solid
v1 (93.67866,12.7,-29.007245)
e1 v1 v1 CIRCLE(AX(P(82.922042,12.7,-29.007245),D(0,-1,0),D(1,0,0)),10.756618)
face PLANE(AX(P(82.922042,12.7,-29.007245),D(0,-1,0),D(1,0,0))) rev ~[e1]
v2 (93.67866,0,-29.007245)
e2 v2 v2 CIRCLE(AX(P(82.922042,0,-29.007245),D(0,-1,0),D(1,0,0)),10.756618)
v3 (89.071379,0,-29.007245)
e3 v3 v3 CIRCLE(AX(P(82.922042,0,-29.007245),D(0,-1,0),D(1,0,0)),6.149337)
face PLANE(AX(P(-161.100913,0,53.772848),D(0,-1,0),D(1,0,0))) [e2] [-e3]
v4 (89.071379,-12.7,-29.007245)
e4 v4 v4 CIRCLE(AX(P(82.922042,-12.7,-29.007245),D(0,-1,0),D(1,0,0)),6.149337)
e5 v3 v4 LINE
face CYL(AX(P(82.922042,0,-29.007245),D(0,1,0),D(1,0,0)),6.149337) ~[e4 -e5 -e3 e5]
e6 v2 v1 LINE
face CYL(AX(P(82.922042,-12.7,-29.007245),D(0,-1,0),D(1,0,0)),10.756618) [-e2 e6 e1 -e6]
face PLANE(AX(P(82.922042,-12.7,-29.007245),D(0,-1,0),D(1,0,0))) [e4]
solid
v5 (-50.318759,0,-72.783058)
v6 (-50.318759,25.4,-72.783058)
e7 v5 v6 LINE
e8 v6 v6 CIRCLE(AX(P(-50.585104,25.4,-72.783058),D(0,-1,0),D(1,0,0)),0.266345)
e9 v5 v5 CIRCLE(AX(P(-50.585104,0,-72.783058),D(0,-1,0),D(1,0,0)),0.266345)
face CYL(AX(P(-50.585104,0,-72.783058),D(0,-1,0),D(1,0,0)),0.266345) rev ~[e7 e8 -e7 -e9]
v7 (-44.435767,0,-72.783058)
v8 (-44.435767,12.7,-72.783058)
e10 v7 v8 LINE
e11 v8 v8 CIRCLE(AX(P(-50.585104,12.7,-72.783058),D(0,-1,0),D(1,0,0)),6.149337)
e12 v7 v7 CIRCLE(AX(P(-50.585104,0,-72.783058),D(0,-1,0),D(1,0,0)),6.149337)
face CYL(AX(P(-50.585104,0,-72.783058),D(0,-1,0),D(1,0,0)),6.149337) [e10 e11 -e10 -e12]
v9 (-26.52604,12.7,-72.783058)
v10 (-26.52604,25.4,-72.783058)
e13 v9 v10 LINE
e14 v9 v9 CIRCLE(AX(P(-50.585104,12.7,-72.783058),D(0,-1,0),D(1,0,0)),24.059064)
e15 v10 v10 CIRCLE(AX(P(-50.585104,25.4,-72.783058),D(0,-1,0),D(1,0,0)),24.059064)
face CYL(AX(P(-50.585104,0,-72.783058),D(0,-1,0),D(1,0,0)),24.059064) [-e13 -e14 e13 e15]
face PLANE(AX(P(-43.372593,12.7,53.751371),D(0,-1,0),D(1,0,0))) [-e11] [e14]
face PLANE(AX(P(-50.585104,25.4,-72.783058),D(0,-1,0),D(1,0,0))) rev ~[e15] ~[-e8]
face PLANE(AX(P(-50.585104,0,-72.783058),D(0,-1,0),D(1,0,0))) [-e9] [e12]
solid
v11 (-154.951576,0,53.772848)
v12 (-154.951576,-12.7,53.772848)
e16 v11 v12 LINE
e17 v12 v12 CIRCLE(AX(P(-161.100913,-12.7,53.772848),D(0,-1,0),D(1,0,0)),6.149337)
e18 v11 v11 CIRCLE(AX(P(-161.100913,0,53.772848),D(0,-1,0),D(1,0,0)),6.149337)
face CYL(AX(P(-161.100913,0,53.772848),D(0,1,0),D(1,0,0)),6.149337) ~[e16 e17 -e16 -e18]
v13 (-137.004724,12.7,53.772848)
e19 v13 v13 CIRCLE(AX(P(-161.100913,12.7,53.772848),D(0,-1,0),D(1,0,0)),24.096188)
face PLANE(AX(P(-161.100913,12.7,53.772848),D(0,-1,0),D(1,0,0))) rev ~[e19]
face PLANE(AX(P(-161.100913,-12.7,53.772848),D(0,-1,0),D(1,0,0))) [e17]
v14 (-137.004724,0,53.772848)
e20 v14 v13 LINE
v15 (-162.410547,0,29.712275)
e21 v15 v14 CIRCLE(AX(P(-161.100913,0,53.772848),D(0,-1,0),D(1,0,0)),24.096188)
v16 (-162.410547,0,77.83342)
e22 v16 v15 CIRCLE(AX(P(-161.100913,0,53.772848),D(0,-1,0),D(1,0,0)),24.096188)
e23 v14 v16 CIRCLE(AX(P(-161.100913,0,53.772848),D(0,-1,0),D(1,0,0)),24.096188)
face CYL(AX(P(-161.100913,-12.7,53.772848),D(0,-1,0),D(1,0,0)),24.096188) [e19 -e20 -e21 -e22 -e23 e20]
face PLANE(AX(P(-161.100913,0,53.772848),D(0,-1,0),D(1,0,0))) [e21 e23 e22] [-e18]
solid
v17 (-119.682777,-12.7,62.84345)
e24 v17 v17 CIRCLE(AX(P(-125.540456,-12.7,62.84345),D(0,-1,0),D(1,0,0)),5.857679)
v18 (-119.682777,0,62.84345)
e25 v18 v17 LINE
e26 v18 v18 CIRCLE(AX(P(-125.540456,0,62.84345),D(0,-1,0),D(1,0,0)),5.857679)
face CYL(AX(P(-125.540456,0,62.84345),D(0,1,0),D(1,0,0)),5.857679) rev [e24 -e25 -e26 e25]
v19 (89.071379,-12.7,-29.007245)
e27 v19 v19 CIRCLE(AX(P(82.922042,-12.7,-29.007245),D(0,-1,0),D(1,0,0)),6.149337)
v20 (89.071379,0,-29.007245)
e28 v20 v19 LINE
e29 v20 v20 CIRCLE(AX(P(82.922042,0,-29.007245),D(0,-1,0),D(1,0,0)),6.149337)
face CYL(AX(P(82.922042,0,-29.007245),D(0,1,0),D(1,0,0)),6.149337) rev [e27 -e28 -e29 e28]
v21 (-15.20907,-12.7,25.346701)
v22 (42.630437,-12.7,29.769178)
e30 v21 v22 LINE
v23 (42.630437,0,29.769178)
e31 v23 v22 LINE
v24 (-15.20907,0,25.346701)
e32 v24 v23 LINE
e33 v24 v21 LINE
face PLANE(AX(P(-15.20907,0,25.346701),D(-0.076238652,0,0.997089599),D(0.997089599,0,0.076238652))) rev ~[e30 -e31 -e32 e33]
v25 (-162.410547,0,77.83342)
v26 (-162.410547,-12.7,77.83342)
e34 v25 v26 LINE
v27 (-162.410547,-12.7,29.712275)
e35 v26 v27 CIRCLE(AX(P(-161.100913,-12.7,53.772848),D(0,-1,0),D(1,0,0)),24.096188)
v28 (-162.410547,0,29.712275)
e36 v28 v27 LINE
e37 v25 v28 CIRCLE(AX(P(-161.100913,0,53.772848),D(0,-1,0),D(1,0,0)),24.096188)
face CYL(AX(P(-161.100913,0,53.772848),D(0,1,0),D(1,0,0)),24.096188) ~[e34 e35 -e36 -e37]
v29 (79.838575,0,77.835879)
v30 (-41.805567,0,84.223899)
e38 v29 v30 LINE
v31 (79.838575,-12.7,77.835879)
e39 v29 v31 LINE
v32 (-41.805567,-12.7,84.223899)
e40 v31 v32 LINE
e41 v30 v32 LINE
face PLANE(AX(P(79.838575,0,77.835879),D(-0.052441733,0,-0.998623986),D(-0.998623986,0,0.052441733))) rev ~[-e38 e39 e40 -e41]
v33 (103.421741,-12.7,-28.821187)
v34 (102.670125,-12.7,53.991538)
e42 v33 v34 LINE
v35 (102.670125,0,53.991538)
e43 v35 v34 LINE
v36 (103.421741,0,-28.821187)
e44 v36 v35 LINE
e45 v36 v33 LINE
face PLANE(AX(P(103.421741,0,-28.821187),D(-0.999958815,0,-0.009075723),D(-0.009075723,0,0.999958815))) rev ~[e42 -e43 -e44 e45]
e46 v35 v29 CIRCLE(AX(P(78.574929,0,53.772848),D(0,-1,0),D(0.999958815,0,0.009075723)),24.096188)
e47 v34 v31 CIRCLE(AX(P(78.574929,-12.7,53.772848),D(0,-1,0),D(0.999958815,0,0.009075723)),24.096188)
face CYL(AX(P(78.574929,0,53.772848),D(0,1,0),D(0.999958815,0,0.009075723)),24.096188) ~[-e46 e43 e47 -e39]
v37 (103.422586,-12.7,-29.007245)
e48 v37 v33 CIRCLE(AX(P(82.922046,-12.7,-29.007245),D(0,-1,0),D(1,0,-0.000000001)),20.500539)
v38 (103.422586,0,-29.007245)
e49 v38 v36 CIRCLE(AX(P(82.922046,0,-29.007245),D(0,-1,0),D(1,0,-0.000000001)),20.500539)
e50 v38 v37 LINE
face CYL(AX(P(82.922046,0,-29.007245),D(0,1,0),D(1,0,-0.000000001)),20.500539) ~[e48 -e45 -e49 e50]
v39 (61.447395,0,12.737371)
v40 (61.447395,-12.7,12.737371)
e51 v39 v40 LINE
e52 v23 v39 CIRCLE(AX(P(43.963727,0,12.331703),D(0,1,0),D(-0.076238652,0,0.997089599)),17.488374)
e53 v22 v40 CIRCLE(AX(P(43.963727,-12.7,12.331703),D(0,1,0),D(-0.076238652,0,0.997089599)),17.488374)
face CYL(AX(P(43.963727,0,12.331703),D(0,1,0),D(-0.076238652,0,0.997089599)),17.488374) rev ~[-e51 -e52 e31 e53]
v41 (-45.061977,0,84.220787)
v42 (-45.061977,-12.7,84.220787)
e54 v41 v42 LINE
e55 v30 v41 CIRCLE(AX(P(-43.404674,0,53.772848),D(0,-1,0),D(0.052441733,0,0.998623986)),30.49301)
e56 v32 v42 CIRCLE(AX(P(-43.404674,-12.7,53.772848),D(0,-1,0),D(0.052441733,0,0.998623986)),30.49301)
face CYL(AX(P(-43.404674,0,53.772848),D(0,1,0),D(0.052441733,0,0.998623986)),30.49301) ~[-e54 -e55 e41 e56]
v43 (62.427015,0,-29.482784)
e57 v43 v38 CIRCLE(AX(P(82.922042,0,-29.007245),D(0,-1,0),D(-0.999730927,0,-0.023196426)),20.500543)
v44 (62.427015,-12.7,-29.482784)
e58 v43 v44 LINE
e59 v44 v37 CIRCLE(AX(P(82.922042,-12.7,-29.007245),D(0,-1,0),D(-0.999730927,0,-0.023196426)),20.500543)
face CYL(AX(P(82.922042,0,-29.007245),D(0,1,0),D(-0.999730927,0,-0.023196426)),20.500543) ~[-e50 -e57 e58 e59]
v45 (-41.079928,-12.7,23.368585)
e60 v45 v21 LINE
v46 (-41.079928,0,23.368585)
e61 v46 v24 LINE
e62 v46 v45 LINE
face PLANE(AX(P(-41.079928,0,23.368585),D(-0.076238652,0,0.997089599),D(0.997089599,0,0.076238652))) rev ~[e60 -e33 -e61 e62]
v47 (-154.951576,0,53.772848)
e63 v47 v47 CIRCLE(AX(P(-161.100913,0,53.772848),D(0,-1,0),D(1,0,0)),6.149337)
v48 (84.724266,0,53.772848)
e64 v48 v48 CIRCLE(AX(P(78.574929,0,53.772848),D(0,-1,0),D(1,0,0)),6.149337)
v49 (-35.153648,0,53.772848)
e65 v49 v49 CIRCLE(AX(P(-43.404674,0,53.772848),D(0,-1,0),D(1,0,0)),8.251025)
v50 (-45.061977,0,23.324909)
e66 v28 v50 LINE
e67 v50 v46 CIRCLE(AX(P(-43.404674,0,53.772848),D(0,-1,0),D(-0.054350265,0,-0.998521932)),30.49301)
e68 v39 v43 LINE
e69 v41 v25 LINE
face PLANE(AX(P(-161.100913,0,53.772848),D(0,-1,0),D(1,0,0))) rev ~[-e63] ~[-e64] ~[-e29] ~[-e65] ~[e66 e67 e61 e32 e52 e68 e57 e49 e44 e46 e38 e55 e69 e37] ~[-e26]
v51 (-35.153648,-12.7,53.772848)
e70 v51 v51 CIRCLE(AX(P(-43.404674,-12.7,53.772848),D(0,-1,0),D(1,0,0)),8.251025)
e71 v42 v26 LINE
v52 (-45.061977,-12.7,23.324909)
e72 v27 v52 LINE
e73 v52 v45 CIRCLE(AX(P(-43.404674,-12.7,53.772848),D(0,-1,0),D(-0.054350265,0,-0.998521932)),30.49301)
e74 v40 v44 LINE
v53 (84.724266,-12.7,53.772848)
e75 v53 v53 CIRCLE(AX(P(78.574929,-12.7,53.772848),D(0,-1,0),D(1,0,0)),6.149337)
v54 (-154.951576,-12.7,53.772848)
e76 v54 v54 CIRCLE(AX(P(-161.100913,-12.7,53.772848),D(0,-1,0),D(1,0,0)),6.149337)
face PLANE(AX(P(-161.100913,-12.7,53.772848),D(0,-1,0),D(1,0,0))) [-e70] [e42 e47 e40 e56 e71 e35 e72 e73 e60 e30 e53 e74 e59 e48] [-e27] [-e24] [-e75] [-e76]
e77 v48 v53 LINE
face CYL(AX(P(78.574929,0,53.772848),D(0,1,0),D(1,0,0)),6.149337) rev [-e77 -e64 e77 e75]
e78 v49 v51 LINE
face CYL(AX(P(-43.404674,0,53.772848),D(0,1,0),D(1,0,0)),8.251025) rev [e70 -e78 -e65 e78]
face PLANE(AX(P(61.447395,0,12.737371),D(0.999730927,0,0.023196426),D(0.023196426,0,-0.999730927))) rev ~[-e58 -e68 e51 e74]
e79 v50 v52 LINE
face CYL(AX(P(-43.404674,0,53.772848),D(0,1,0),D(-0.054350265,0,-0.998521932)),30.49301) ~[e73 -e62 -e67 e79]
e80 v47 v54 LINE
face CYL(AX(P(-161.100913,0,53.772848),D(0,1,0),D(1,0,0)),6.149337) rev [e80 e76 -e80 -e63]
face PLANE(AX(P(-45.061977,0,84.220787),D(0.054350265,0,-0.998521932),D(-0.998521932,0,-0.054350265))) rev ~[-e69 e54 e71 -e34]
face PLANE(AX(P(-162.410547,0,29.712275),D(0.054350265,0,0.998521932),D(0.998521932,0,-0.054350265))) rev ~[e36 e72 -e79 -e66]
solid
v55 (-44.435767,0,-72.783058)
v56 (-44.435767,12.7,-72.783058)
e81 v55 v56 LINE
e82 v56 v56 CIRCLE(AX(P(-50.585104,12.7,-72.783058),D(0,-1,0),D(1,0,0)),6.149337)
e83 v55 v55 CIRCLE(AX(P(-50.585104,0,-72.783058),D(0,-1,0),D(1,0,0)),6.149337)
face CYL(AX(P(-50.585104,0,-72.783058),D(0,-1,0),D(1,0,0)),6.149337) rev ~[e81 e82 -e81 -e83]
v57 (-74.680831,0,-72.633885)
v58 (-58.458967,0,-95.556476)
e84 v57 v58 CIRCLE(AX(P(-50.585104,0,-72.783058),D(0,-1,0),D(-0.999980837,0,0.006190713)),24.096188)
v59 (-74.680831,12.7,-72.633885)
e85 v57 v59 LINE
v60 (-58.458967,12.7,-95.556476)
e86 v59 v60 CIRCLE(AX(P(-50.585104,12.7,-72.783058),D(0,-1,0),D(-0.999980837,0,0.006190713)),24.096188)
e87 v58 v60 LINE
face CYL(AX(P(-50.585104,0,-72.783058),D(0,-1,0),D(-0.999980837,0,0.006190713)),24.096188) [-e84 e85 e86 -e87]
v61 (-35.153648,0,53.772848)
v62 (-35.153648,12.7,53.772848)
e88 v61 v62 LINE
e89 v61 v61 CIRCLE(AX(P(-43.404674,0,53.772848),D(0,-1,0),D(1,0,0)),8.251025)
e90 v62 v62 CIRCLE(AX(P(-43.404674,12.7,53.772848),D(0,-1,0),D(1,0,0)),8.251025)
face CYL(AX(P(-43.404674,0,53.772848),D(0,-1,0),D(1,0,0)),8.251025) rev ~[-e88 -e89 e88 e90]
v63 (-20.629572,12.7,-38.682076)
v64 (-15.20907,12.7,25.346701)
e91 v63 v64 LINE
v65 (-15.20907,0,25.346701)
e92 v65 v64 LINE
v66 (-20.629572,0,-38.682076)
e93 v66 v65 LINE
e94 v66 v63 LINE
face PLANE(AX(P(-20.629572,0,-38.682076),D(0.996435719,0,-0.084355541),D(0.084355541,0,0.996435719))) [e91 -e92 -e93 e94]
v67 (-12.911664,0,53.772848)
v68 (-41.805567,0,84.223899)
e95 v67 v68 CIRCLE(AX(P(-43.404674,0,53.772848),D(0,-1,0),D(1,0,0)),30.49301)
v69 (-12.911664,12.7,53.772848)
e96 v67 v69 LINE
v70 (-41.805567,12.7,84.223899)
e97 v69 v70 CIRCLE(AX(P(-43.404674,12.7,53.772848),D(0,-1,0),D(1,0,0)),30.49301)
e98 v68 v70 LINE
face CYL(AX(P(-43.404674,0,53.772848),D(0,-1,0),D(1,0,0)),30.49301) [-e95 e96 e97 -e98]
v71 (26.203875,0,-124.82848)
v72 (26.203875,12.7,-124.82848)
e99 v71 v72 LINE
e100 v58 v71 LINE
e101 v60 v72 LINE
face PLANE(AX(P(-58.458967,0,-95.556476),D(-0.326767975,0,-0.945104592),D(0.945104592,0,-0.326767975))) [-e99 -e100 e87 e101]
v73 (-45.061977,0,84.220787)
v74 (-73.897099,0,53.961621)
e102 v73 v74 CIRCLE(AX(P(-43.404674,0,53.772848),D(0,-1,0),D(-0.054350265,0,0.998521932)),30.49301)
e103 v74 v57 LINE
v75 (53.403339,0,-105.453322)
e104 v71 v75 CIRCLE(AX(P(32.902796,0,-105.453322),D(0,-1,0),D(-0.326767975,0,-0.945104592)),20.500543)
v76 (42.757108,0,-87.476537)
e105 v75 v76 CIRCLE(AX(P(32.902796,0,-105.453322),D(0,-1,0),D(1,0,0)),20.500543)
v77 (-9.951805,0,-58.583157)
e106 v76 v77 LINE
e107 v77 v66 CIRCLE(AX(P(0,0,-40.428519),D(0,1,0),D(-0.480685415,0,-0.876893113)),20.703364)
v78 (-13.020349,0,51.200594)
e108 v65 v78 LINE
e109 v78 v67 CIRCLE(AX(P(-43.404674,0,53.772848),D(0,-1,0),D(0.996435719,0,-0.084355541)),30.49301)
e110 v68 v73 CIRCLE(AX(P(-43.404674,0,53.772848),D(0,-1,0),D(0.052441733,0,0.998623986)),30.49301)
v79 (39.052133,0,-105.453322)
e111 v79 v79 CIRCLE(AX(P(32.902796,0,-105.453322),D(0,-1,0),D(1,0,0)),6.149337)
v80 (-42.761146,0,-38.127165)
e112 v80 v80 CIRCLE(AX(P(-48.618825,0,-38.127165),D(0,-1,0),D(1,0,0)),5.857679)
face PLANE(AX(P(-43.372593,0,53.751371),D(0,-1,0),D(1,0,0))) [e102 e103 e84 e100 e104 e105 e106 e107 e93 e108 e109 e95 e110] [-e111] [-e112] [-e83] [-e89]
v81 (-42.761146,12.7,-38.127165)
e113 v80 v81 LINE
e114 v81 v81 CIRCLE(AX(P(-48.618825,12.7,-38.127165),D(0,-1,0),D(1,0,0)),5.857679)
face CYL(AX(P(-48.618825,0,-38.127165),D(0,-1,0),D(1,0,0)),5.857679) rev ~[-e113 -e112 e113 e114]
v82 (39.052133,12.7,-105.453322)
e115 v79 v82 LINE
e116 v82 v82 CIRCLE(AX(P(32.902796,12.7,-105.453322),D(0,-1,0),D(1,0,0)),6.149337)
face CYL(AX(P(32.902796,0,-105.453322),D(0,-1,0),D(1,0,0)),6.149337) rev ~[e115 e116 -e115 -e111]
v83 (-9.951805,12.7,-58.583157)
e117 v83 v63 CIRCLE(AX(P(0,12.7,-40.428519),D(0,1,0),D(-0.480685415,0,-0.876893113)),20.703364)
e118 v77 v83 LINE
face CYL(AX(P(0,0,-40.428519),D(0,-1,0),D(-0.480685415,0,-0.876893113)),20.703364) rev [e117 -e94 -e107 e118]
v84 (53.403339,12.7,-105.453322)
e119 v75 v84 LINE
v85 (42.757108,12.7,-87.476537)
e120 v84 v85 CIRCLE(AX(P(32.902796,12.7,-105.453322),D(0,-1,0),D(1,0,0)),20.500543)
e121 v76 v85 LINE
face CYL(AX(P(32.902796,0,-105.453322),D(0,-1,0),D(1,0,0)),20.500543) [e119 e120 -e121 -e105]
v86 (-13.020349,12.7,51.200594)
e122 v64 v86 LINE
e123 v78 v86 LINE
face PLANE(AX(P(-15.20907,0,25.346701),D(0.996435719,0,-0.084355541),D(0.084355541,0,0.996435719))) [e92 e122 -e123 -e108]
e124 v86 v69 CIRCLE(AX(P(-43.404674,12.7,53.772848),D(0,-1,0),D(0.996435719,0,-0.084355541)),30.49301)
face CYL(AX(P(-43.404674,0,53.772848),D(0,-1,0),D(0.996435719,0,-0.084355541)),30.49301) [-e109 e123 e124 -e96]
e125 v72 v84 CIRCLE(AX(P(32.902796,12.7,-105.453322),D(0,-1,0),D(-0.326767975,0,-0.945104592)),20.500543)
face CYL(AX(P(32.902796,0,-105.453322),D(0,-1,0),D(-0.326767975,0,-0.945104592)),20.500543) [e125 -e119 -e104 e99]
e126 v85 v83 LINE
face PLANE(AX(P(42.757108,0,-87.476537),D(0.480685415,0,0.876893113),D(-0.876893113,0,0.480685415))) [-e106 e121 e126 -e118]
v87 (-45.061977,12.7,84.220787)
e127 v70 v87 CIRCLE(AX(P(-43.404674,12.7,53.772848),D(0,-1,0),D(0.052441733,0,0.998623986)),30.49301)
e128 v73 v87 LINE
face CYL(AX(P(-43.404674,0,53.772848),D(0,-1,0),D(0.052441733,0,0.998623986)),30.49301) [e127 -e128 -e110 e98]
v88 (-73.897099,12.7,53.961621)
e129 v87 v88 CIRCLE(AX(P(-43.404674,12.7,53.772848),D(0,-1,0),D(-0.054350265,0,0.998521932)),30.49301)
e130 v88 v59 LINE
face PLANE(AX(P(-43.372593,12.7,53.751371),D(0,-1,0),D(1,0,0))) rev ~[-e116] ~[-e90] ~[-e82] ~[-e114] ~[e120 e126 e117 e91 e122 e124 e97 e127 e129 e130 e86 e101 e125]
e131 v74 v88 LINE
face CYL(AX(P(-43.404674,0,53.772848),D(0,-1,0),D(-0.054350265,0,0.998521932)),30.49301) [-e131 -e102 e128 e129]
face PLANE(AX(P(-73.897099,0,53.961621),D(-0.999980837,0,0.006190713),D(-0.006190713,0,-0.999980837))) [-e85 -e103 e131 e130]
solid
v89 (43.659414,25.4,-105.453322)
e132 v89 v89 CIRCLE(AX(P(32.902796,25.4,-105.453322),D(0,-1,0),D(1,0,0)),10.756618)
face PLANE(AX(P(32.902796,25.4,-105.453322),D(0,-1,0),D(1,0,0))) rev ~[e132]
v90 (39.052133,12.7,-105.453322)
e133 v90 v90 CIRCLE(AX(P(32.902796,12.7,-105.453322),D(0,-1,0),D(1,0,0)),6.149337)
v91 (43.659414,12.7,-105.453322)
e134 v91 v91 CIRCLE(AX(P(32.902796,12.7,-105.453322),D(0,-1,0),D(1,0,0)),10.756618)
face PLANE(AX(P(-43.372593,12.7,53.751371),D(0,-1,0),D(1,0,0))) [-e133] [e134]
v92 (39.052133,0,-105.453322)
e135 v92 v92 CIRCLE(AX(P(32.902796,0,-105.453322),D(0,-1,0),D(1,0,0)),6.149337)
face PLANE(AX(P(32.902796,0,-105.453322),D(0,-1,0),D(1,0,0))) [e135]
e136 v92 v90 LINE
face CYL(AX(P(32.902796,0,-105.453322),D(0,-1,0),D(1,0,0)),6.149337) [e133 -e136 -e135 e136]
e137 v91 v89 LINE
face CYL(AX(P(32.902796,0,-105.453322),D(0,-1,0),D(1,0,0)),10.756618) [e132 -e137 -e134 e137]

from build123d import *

# Parameters (mm, degrees)
F0_R     = 6.1493367897
F0_R_2   = 5.8576786547
F0_R_3   = 8.2510252631
F1_DEPTH = 12.7
F2_DEPTH = 12.7
F3_R     = 10.7566179169
F5_DEPTH = 25.4
F3_R_2   = 24.0961882632
F4_R     = 24.0590637796
F4_R_2   = 0.2663452523
F4_R_3   = 10.7566179169


with BuildPart() as f1:
    # F0 (on Front) → F1 (new body)
    with BuildSketch(Plane.XZ):
        with BuildLine():
            ThreePointArc((-137.004724496, 53.7728478672), (-144.5318286506, 71.2683255862), (-162.4105469667, 77.8334203262))
            ThreePointArc((-162.4105469667, 77.8334203262), (-185.1971010223, 53.7728478672), (-162.4105469667, 29.7122754082))
            ThreePointArc((-162.4105469667, 29.7122754082), (-144.5318286506, 36.2773701482), (-137.004724496, 53.7728478672))
        make_face()
        with Locations((-161.1009127591, 53.7728478672)):
            Circle(F0_R, mode=Mode.SUBTRACT)
        with BuildLine():
            ThreePointArc((-73.8970993097, 53.9616213386), (-65.4796718147, 74.8089623918), (-45.0619767979, 84.2207871257))
            Line((-45.0619767979, 84.2207871257), (-162.4105469667, 77.8334203262))
            ThreePointArc((-162.4105469667, 77.8334203262), (-144.5318286506, 71.2683255862), (-137.004724496, 53.7728478672))
            ThreePointArc((-137.004724496, 53.7728478672), (-144.5318286506, 36.2773701482), (-162.4105469667, 29.7122754082))
            Line((-162.4105469667, 29.7122754082), (-74.0769888087, 24.9042165128))
            Line((-74.0769888087, 24.9042165128), (-73.8970993097, 53.9616213386))
        make_face()
        with Locations((-125.5404559068, 62.8434497782)):
            Circle(F0_R_2, mode=Mode.SUBTRACT)
        with BuildLine():
            ThreePointArc((-45.0619767979, 23.3249086087), (-65.6094773456, 32.873796427), (-73.8970993097, 53.9616213386))
            Line((-73.8970993097, 53.9616213386), (-74.0769888087, 24.9042165128))
            Line((-74.0769888087, 24.9042165128), (-45.0619767979, 23.3249086087))
        make_face()
        with BuildLine():
            ThreePointArc((-13.0203492827, 51.2005935197), (-12.9388471647, 52.4855731298), (-12.9116636365, 53.7728478672))
            ThreePointArc((-12.9116636365, 53.7728478672), (-21.2847140662, 74.7616793609), (-41.8055673522, 84.2238990469))
            ThreePointArc((-41.8055673522, 84.2238990469), (-43.4338136458, 84.2658439437), (-45.0619767979, 84.2207871257))
            ThreePointArc((-45.0619767979, 84.2207871257), (-65.4796718147, 74.8089623918), (-73.8970993097, 53.9616213386))
            ThreePointArc((-73.8970993097, 53.9616213386), (-65.6094773456, 32.873796427), (-45.0619767979, 23.3249086087))
            ThreePointArc((-45.0619767979, 23.3249086087), (-43.0702384678, 23.2816718981), (-41.0799276521, 23.368584762))
            ThreePointArc((-41.0799276521, 23.368584762), (-21.9308291165, 32.1234215378), (-13.0203492827, 51.2005935197))
        make_face()
        with Locations((-43.4046736365, 53.7728478672)):
            Circle(F0_R_3, mode=Mode.SUBTRACT)
        with BuildLine():
            Line((-15.2090695609, 25.3467012272), (-13.0203492827, 51.2005935197))
            ThreePointArc((-13.0203492827, 51.2005935197), (-21.9308291165, 32.1234215378), (-41.0799276521, 23.368584762))
            Line((-41.0799276521, 23.368584762), (-15.2090695609, 25.3467012272))
        make_face()
        with BuildLine():
            ThreePointArc((-41.8055673522, 84.2238990469), (-21.2847140662, 74.7616793609), (-12.9116636365, 53.7728478672))
            ThreePointArc((-12.9116636365, 53.7728478672), (-12.9388471647, 52.4855731298), (-13.0203492827, 51.2005935197))
            Line((-13.0203492827, 51.2005935197), (-15.2090695609, 25.3467012272))
            Line((-15.2090695609, 25.3467012272), (42.6304365589, 29.7691784017))
            ThreePointArc((42.6304365589, 29.7691784017), (55.6995392523, 25.2975780046), (61.447394796, 12.7373705236))
            Line((61.447394796, 12.7373705236), (62.4270150936, -29.4827839898))
            ThreePointArc((62.4270150936, -29.4827839898), (82.5912356818, -8.509370566), (103.4217411847, -28.8211873993))
            Line((103.4217411847, -28.8211873993), (102.6701248935, 53.9915381907))
            ThreePointArc((102.6701248935, 53.9915381907), (102.6708691973, 53.8821941548), (102.6711173003, 53.7728478672))
            ThreePointArc((102.6711173003, 53.7728478672), (61.0952932065, 37.1870521358), (79.8385749048, 77.8358794288))
            Line((79.8385749048, 77.8358794288), (-41.8055673522, 84.2238990469))
        make_face()
        with BuildLine():
            ThreePointArc((102.6701248935, 53.9915381907), (95.9791200745, 70.4377938061), (79.8385749048, 77.8358794288))
            ThreePointArc((79.8385749048, 77.8358794288), (61.0952932065, 37.1870521358), (102.6711173003, 53.7728478672))
            ThreePointArc((102.6711173003, 53.7728478672), (102.6708691973, 53.8821941548), (102.6701248935, 53.9915381907))
        make_face()
        with Locations((78.5749290371, 53.7728478672)):
            Circle(F0_R, mode=Mode.SUBTRACT)
        with BuildLine():
            ThreePointArc((103.4225855041, -29.0072446459), (103.4223744232, -28.9142150647), (103.4217411847, -28.8211873993))
            ThreePointArc((103.4217411847, -28.8211873993), (82.5912356818, -8.509370566), (62.4270150936, -29.4827839898))
            ThreePointArc((62.4270150936, -29.4827839898), (83.1598278924, -49.506408842), (103.4225855041, -29.0072446459))
        make_face()
        with Locations((82.9220422244, -29.0072446459)):
            Circle(F0_R, mode=Mode.SUBTRACT)
    extrude(amount=F1_DEPTH)


with BuildPart() as f2:
    # F0 (on Front) → F2 (new body)
    with BuildSketch(Plane.XZ):
        with BuildLine():
            ThreePointArc((-13.0203492827, 51.2005935197), (-12.9388471647, 52.4855731298), (-12.9116636365, 53.7728478672))
            ThreePointArc((-12.9116636365, 53.7728478672), (-21.2847140662, 74.7616793609), (-41.8055673522, 84.2238990469))
            ThreePointArc((-41.8055673522, 84.2238990469), (-43.4338136458, 84.2658439437), (-45.0619767979, 84.2207871257))
            ThreePointArc((-45.0619767979, 84.2207871257), (-65.4796718147, 74.8089623918), (-73.8970993097, 53.9616213386))
            ThreePointArc((-73.8970993097, 53.9616213386), (-65.6094773456, 32.873796427), (-45.0619767979, 23.3249086087))
            ThreePointArc((-45.0619767979, 23.3249086087), (-43.0702384678, 23.2816718981), (-41.0799276521, 23.368584762))
            ThreePointArc((-41.0799276521, 23.368584762), (-21.9308291165, 32.1234215378), (-13.0203492827, 51.2005935197))
        make_face()
        with Locations((-43.4046736365, 53.7728478672)):
            Circle(F0_R_3, mode=Mode.SUBTRACT)
        with BuildLine():
            Line((-15.2090695609, 25.3467012272), (-13.0203492827, 51.2005935197))
            ThreePointArc((-13.0203492827, 51.2005935197), (-21.9308291165, 32.1234215378), (-41.0799276521, 23.368584762))
            Line((-41.0799276521, 23.368584762), (-15.2090695609, 25.3467012272))
        make_face()
        with BuildLine():
            ThreePointArc((-45.0619767979, 23.3249086087), (-65.6094773456, 32.873796427), (-73.8970993097, 53.9616213386))
            Line((-73.8970993097, 53.9616213386), (-74.0769888087, 24.9042165128))
            Line((-74.0769888087, 24.9042165128), (-45.0619767979, 23.3249086087))
        make_face()
        with BuildLine():
            Line((-15.2090695609, 25.3467012272), (-41.0799276521, 23.368584762))
            ThreePointArc((-41.0799276521, 23.368584762), (-43.0702384678, 23.2816718981), (-45.0619767979, 23.3249086087))
            Line((-45.0619767979, 23.3249086087), (-74.0769888087, 24.9042165128))
            Line((-74.0769888087, 24.9042165128), (-74.6808307664, -72.6338849963))
            ThreePointArc((-74.6808307664, -72.6338849963), (-50.5105176005, -48.6869847544), (-26.4889159868, -72.7830575806))
            ThreePointArc((-26.4889159868, -72.7830575806), (-36.6048286441, -92.4090144439), (-58.4589669004, -95.5564757645))
            Line((-58.4589669004, -95.5564757645), (26.2038747484, -124.8284797014))
            ThreePointArc((26.2038747484, -124.8284797014), (14.1603031043, -97.1472253354), (42.75710793, -87.4765368913))
            Line((42.75710793, -87.4765368913), (-9.9518053451, -58.5831569567))
            ThreePointArc((-9.9518053451, -58.5831569567), (-18.2433115483, -50.2168226605), (-20.6295718572, -38.6820757448))
            Line((-20.6295718572, -38.6820757448), (-15.2090695609, 25.3467012272))
        make_face()
        with Locations((-48.6188251285, -38.1271646444)):
            Circle(F0_R_2, mode=Mode.SUBTRACT)
        with BuildLine():
            ThreePointArc((-26.4889159868, -72.7830575806), (-50.5105176005, -48.6869847544), (-74.6808307664, -72.6338849963))
            ThreePointArc((-74.6808307664, -72.6338849963), (-70.2542412355, -86.702516588), (-58.4589669004, -95.5564757645))
            ThreePointArc((-58.4589669004, -95.5564757645), (-36.6048286441, -92.4090144439), (-26.4889159868, -72.7830575806))
        make_face()
        with Locations((-50.58510425, -72.7830575806)):
            Circle(F0_R, mode=Mode.SUBTRACT)
        with BuildLine():
            ThreePointArc((53.4033390474, -105.4533221036), (50.542113041, -95.0069466128), (42.75710793, -87.4765368913))
            ThreePointArc((42.75710793, -87.4765368913), (14.1603031043, -97.1472253354), (26.2038747484, -124.8284797014))
            ThreePointArc((26.2038747484, -124.8284797014), (44.7969278184, -122.1506840966), (53.4033390474, -105.4533221036))
        make_face()
        with Locations((32.9027957677, -105.4533221036)):
            Circle(F0_R, mode=Mode.SUBTRACT)
    extrude(amount=-F2_DEPTH)


with BuildPart() as f5:
    # F3 (on face) → F5 (new body)
    with BuildSketch(Plane.XZ.offset(12.7)):
        with Locations((82.9220422244, -29.0072446459)):
            Circle(F3_R)
    extrude(amount=-F5_DEPTH)

    # F6: cut F1, F2
    add(f1.part, mode=Mode.SUBTRACT)
    add(f2.part, mode=Mode.SUBTRACT)


with BuildPart() as f5b:
    # F3 (on face) → F5, piece 2 (new body)
    with BuildSketch(Plane.XZ.offset(12.7)):
        with Locations((-161.1009127591, 53.7728478672)):
            Circle(F3_R_2)
    extrude(amount=-F5_DEPTH)

    # F6: cut F1, F2
    add(f1.part, mode=Mode.SUBTRACT)
    add(f2.part, mode=Mode.SUBTRACT)


with BuildPart() as f5c:
    # F4 (on face) → F5, piece 3 (new body)
    with BuildSketch(Plane.XZ):
        with Locations((-50.58510425, -72.7830575806)):
            Circle(F4_R)
        with Locations((-50.58510425, -72.7830575806)):
            Circle(F4_R_2, mode=Mode.SUBTRACT)
    extrude(amount=-F5_DEPTH)

    # F6: cut F1, F2
    add(f1.part, mode=Mode.SUBTRACT)
    add(f2.part, mode=Mode.SUBTRACT)


with BuildPart() as f5d:
    # F4 (on face) → F5, piece 4 (new body)
    with BuildSketch(Plane.XZ):
        with Locations((32.9027957677, -105.4533221036)):
            Circle(F4_R_3)
    extrude(amount=-F5_DEPTH)

    # F6: cut F1, F2
    add(f1.part, mode=Mode.SUBTRACT)
    add(f2.part, mode=Mode.SUBTRACT)


solid = Compound([f1.part, f2.part, f5.part, f5b.part, f5c.part, f5d.part])
